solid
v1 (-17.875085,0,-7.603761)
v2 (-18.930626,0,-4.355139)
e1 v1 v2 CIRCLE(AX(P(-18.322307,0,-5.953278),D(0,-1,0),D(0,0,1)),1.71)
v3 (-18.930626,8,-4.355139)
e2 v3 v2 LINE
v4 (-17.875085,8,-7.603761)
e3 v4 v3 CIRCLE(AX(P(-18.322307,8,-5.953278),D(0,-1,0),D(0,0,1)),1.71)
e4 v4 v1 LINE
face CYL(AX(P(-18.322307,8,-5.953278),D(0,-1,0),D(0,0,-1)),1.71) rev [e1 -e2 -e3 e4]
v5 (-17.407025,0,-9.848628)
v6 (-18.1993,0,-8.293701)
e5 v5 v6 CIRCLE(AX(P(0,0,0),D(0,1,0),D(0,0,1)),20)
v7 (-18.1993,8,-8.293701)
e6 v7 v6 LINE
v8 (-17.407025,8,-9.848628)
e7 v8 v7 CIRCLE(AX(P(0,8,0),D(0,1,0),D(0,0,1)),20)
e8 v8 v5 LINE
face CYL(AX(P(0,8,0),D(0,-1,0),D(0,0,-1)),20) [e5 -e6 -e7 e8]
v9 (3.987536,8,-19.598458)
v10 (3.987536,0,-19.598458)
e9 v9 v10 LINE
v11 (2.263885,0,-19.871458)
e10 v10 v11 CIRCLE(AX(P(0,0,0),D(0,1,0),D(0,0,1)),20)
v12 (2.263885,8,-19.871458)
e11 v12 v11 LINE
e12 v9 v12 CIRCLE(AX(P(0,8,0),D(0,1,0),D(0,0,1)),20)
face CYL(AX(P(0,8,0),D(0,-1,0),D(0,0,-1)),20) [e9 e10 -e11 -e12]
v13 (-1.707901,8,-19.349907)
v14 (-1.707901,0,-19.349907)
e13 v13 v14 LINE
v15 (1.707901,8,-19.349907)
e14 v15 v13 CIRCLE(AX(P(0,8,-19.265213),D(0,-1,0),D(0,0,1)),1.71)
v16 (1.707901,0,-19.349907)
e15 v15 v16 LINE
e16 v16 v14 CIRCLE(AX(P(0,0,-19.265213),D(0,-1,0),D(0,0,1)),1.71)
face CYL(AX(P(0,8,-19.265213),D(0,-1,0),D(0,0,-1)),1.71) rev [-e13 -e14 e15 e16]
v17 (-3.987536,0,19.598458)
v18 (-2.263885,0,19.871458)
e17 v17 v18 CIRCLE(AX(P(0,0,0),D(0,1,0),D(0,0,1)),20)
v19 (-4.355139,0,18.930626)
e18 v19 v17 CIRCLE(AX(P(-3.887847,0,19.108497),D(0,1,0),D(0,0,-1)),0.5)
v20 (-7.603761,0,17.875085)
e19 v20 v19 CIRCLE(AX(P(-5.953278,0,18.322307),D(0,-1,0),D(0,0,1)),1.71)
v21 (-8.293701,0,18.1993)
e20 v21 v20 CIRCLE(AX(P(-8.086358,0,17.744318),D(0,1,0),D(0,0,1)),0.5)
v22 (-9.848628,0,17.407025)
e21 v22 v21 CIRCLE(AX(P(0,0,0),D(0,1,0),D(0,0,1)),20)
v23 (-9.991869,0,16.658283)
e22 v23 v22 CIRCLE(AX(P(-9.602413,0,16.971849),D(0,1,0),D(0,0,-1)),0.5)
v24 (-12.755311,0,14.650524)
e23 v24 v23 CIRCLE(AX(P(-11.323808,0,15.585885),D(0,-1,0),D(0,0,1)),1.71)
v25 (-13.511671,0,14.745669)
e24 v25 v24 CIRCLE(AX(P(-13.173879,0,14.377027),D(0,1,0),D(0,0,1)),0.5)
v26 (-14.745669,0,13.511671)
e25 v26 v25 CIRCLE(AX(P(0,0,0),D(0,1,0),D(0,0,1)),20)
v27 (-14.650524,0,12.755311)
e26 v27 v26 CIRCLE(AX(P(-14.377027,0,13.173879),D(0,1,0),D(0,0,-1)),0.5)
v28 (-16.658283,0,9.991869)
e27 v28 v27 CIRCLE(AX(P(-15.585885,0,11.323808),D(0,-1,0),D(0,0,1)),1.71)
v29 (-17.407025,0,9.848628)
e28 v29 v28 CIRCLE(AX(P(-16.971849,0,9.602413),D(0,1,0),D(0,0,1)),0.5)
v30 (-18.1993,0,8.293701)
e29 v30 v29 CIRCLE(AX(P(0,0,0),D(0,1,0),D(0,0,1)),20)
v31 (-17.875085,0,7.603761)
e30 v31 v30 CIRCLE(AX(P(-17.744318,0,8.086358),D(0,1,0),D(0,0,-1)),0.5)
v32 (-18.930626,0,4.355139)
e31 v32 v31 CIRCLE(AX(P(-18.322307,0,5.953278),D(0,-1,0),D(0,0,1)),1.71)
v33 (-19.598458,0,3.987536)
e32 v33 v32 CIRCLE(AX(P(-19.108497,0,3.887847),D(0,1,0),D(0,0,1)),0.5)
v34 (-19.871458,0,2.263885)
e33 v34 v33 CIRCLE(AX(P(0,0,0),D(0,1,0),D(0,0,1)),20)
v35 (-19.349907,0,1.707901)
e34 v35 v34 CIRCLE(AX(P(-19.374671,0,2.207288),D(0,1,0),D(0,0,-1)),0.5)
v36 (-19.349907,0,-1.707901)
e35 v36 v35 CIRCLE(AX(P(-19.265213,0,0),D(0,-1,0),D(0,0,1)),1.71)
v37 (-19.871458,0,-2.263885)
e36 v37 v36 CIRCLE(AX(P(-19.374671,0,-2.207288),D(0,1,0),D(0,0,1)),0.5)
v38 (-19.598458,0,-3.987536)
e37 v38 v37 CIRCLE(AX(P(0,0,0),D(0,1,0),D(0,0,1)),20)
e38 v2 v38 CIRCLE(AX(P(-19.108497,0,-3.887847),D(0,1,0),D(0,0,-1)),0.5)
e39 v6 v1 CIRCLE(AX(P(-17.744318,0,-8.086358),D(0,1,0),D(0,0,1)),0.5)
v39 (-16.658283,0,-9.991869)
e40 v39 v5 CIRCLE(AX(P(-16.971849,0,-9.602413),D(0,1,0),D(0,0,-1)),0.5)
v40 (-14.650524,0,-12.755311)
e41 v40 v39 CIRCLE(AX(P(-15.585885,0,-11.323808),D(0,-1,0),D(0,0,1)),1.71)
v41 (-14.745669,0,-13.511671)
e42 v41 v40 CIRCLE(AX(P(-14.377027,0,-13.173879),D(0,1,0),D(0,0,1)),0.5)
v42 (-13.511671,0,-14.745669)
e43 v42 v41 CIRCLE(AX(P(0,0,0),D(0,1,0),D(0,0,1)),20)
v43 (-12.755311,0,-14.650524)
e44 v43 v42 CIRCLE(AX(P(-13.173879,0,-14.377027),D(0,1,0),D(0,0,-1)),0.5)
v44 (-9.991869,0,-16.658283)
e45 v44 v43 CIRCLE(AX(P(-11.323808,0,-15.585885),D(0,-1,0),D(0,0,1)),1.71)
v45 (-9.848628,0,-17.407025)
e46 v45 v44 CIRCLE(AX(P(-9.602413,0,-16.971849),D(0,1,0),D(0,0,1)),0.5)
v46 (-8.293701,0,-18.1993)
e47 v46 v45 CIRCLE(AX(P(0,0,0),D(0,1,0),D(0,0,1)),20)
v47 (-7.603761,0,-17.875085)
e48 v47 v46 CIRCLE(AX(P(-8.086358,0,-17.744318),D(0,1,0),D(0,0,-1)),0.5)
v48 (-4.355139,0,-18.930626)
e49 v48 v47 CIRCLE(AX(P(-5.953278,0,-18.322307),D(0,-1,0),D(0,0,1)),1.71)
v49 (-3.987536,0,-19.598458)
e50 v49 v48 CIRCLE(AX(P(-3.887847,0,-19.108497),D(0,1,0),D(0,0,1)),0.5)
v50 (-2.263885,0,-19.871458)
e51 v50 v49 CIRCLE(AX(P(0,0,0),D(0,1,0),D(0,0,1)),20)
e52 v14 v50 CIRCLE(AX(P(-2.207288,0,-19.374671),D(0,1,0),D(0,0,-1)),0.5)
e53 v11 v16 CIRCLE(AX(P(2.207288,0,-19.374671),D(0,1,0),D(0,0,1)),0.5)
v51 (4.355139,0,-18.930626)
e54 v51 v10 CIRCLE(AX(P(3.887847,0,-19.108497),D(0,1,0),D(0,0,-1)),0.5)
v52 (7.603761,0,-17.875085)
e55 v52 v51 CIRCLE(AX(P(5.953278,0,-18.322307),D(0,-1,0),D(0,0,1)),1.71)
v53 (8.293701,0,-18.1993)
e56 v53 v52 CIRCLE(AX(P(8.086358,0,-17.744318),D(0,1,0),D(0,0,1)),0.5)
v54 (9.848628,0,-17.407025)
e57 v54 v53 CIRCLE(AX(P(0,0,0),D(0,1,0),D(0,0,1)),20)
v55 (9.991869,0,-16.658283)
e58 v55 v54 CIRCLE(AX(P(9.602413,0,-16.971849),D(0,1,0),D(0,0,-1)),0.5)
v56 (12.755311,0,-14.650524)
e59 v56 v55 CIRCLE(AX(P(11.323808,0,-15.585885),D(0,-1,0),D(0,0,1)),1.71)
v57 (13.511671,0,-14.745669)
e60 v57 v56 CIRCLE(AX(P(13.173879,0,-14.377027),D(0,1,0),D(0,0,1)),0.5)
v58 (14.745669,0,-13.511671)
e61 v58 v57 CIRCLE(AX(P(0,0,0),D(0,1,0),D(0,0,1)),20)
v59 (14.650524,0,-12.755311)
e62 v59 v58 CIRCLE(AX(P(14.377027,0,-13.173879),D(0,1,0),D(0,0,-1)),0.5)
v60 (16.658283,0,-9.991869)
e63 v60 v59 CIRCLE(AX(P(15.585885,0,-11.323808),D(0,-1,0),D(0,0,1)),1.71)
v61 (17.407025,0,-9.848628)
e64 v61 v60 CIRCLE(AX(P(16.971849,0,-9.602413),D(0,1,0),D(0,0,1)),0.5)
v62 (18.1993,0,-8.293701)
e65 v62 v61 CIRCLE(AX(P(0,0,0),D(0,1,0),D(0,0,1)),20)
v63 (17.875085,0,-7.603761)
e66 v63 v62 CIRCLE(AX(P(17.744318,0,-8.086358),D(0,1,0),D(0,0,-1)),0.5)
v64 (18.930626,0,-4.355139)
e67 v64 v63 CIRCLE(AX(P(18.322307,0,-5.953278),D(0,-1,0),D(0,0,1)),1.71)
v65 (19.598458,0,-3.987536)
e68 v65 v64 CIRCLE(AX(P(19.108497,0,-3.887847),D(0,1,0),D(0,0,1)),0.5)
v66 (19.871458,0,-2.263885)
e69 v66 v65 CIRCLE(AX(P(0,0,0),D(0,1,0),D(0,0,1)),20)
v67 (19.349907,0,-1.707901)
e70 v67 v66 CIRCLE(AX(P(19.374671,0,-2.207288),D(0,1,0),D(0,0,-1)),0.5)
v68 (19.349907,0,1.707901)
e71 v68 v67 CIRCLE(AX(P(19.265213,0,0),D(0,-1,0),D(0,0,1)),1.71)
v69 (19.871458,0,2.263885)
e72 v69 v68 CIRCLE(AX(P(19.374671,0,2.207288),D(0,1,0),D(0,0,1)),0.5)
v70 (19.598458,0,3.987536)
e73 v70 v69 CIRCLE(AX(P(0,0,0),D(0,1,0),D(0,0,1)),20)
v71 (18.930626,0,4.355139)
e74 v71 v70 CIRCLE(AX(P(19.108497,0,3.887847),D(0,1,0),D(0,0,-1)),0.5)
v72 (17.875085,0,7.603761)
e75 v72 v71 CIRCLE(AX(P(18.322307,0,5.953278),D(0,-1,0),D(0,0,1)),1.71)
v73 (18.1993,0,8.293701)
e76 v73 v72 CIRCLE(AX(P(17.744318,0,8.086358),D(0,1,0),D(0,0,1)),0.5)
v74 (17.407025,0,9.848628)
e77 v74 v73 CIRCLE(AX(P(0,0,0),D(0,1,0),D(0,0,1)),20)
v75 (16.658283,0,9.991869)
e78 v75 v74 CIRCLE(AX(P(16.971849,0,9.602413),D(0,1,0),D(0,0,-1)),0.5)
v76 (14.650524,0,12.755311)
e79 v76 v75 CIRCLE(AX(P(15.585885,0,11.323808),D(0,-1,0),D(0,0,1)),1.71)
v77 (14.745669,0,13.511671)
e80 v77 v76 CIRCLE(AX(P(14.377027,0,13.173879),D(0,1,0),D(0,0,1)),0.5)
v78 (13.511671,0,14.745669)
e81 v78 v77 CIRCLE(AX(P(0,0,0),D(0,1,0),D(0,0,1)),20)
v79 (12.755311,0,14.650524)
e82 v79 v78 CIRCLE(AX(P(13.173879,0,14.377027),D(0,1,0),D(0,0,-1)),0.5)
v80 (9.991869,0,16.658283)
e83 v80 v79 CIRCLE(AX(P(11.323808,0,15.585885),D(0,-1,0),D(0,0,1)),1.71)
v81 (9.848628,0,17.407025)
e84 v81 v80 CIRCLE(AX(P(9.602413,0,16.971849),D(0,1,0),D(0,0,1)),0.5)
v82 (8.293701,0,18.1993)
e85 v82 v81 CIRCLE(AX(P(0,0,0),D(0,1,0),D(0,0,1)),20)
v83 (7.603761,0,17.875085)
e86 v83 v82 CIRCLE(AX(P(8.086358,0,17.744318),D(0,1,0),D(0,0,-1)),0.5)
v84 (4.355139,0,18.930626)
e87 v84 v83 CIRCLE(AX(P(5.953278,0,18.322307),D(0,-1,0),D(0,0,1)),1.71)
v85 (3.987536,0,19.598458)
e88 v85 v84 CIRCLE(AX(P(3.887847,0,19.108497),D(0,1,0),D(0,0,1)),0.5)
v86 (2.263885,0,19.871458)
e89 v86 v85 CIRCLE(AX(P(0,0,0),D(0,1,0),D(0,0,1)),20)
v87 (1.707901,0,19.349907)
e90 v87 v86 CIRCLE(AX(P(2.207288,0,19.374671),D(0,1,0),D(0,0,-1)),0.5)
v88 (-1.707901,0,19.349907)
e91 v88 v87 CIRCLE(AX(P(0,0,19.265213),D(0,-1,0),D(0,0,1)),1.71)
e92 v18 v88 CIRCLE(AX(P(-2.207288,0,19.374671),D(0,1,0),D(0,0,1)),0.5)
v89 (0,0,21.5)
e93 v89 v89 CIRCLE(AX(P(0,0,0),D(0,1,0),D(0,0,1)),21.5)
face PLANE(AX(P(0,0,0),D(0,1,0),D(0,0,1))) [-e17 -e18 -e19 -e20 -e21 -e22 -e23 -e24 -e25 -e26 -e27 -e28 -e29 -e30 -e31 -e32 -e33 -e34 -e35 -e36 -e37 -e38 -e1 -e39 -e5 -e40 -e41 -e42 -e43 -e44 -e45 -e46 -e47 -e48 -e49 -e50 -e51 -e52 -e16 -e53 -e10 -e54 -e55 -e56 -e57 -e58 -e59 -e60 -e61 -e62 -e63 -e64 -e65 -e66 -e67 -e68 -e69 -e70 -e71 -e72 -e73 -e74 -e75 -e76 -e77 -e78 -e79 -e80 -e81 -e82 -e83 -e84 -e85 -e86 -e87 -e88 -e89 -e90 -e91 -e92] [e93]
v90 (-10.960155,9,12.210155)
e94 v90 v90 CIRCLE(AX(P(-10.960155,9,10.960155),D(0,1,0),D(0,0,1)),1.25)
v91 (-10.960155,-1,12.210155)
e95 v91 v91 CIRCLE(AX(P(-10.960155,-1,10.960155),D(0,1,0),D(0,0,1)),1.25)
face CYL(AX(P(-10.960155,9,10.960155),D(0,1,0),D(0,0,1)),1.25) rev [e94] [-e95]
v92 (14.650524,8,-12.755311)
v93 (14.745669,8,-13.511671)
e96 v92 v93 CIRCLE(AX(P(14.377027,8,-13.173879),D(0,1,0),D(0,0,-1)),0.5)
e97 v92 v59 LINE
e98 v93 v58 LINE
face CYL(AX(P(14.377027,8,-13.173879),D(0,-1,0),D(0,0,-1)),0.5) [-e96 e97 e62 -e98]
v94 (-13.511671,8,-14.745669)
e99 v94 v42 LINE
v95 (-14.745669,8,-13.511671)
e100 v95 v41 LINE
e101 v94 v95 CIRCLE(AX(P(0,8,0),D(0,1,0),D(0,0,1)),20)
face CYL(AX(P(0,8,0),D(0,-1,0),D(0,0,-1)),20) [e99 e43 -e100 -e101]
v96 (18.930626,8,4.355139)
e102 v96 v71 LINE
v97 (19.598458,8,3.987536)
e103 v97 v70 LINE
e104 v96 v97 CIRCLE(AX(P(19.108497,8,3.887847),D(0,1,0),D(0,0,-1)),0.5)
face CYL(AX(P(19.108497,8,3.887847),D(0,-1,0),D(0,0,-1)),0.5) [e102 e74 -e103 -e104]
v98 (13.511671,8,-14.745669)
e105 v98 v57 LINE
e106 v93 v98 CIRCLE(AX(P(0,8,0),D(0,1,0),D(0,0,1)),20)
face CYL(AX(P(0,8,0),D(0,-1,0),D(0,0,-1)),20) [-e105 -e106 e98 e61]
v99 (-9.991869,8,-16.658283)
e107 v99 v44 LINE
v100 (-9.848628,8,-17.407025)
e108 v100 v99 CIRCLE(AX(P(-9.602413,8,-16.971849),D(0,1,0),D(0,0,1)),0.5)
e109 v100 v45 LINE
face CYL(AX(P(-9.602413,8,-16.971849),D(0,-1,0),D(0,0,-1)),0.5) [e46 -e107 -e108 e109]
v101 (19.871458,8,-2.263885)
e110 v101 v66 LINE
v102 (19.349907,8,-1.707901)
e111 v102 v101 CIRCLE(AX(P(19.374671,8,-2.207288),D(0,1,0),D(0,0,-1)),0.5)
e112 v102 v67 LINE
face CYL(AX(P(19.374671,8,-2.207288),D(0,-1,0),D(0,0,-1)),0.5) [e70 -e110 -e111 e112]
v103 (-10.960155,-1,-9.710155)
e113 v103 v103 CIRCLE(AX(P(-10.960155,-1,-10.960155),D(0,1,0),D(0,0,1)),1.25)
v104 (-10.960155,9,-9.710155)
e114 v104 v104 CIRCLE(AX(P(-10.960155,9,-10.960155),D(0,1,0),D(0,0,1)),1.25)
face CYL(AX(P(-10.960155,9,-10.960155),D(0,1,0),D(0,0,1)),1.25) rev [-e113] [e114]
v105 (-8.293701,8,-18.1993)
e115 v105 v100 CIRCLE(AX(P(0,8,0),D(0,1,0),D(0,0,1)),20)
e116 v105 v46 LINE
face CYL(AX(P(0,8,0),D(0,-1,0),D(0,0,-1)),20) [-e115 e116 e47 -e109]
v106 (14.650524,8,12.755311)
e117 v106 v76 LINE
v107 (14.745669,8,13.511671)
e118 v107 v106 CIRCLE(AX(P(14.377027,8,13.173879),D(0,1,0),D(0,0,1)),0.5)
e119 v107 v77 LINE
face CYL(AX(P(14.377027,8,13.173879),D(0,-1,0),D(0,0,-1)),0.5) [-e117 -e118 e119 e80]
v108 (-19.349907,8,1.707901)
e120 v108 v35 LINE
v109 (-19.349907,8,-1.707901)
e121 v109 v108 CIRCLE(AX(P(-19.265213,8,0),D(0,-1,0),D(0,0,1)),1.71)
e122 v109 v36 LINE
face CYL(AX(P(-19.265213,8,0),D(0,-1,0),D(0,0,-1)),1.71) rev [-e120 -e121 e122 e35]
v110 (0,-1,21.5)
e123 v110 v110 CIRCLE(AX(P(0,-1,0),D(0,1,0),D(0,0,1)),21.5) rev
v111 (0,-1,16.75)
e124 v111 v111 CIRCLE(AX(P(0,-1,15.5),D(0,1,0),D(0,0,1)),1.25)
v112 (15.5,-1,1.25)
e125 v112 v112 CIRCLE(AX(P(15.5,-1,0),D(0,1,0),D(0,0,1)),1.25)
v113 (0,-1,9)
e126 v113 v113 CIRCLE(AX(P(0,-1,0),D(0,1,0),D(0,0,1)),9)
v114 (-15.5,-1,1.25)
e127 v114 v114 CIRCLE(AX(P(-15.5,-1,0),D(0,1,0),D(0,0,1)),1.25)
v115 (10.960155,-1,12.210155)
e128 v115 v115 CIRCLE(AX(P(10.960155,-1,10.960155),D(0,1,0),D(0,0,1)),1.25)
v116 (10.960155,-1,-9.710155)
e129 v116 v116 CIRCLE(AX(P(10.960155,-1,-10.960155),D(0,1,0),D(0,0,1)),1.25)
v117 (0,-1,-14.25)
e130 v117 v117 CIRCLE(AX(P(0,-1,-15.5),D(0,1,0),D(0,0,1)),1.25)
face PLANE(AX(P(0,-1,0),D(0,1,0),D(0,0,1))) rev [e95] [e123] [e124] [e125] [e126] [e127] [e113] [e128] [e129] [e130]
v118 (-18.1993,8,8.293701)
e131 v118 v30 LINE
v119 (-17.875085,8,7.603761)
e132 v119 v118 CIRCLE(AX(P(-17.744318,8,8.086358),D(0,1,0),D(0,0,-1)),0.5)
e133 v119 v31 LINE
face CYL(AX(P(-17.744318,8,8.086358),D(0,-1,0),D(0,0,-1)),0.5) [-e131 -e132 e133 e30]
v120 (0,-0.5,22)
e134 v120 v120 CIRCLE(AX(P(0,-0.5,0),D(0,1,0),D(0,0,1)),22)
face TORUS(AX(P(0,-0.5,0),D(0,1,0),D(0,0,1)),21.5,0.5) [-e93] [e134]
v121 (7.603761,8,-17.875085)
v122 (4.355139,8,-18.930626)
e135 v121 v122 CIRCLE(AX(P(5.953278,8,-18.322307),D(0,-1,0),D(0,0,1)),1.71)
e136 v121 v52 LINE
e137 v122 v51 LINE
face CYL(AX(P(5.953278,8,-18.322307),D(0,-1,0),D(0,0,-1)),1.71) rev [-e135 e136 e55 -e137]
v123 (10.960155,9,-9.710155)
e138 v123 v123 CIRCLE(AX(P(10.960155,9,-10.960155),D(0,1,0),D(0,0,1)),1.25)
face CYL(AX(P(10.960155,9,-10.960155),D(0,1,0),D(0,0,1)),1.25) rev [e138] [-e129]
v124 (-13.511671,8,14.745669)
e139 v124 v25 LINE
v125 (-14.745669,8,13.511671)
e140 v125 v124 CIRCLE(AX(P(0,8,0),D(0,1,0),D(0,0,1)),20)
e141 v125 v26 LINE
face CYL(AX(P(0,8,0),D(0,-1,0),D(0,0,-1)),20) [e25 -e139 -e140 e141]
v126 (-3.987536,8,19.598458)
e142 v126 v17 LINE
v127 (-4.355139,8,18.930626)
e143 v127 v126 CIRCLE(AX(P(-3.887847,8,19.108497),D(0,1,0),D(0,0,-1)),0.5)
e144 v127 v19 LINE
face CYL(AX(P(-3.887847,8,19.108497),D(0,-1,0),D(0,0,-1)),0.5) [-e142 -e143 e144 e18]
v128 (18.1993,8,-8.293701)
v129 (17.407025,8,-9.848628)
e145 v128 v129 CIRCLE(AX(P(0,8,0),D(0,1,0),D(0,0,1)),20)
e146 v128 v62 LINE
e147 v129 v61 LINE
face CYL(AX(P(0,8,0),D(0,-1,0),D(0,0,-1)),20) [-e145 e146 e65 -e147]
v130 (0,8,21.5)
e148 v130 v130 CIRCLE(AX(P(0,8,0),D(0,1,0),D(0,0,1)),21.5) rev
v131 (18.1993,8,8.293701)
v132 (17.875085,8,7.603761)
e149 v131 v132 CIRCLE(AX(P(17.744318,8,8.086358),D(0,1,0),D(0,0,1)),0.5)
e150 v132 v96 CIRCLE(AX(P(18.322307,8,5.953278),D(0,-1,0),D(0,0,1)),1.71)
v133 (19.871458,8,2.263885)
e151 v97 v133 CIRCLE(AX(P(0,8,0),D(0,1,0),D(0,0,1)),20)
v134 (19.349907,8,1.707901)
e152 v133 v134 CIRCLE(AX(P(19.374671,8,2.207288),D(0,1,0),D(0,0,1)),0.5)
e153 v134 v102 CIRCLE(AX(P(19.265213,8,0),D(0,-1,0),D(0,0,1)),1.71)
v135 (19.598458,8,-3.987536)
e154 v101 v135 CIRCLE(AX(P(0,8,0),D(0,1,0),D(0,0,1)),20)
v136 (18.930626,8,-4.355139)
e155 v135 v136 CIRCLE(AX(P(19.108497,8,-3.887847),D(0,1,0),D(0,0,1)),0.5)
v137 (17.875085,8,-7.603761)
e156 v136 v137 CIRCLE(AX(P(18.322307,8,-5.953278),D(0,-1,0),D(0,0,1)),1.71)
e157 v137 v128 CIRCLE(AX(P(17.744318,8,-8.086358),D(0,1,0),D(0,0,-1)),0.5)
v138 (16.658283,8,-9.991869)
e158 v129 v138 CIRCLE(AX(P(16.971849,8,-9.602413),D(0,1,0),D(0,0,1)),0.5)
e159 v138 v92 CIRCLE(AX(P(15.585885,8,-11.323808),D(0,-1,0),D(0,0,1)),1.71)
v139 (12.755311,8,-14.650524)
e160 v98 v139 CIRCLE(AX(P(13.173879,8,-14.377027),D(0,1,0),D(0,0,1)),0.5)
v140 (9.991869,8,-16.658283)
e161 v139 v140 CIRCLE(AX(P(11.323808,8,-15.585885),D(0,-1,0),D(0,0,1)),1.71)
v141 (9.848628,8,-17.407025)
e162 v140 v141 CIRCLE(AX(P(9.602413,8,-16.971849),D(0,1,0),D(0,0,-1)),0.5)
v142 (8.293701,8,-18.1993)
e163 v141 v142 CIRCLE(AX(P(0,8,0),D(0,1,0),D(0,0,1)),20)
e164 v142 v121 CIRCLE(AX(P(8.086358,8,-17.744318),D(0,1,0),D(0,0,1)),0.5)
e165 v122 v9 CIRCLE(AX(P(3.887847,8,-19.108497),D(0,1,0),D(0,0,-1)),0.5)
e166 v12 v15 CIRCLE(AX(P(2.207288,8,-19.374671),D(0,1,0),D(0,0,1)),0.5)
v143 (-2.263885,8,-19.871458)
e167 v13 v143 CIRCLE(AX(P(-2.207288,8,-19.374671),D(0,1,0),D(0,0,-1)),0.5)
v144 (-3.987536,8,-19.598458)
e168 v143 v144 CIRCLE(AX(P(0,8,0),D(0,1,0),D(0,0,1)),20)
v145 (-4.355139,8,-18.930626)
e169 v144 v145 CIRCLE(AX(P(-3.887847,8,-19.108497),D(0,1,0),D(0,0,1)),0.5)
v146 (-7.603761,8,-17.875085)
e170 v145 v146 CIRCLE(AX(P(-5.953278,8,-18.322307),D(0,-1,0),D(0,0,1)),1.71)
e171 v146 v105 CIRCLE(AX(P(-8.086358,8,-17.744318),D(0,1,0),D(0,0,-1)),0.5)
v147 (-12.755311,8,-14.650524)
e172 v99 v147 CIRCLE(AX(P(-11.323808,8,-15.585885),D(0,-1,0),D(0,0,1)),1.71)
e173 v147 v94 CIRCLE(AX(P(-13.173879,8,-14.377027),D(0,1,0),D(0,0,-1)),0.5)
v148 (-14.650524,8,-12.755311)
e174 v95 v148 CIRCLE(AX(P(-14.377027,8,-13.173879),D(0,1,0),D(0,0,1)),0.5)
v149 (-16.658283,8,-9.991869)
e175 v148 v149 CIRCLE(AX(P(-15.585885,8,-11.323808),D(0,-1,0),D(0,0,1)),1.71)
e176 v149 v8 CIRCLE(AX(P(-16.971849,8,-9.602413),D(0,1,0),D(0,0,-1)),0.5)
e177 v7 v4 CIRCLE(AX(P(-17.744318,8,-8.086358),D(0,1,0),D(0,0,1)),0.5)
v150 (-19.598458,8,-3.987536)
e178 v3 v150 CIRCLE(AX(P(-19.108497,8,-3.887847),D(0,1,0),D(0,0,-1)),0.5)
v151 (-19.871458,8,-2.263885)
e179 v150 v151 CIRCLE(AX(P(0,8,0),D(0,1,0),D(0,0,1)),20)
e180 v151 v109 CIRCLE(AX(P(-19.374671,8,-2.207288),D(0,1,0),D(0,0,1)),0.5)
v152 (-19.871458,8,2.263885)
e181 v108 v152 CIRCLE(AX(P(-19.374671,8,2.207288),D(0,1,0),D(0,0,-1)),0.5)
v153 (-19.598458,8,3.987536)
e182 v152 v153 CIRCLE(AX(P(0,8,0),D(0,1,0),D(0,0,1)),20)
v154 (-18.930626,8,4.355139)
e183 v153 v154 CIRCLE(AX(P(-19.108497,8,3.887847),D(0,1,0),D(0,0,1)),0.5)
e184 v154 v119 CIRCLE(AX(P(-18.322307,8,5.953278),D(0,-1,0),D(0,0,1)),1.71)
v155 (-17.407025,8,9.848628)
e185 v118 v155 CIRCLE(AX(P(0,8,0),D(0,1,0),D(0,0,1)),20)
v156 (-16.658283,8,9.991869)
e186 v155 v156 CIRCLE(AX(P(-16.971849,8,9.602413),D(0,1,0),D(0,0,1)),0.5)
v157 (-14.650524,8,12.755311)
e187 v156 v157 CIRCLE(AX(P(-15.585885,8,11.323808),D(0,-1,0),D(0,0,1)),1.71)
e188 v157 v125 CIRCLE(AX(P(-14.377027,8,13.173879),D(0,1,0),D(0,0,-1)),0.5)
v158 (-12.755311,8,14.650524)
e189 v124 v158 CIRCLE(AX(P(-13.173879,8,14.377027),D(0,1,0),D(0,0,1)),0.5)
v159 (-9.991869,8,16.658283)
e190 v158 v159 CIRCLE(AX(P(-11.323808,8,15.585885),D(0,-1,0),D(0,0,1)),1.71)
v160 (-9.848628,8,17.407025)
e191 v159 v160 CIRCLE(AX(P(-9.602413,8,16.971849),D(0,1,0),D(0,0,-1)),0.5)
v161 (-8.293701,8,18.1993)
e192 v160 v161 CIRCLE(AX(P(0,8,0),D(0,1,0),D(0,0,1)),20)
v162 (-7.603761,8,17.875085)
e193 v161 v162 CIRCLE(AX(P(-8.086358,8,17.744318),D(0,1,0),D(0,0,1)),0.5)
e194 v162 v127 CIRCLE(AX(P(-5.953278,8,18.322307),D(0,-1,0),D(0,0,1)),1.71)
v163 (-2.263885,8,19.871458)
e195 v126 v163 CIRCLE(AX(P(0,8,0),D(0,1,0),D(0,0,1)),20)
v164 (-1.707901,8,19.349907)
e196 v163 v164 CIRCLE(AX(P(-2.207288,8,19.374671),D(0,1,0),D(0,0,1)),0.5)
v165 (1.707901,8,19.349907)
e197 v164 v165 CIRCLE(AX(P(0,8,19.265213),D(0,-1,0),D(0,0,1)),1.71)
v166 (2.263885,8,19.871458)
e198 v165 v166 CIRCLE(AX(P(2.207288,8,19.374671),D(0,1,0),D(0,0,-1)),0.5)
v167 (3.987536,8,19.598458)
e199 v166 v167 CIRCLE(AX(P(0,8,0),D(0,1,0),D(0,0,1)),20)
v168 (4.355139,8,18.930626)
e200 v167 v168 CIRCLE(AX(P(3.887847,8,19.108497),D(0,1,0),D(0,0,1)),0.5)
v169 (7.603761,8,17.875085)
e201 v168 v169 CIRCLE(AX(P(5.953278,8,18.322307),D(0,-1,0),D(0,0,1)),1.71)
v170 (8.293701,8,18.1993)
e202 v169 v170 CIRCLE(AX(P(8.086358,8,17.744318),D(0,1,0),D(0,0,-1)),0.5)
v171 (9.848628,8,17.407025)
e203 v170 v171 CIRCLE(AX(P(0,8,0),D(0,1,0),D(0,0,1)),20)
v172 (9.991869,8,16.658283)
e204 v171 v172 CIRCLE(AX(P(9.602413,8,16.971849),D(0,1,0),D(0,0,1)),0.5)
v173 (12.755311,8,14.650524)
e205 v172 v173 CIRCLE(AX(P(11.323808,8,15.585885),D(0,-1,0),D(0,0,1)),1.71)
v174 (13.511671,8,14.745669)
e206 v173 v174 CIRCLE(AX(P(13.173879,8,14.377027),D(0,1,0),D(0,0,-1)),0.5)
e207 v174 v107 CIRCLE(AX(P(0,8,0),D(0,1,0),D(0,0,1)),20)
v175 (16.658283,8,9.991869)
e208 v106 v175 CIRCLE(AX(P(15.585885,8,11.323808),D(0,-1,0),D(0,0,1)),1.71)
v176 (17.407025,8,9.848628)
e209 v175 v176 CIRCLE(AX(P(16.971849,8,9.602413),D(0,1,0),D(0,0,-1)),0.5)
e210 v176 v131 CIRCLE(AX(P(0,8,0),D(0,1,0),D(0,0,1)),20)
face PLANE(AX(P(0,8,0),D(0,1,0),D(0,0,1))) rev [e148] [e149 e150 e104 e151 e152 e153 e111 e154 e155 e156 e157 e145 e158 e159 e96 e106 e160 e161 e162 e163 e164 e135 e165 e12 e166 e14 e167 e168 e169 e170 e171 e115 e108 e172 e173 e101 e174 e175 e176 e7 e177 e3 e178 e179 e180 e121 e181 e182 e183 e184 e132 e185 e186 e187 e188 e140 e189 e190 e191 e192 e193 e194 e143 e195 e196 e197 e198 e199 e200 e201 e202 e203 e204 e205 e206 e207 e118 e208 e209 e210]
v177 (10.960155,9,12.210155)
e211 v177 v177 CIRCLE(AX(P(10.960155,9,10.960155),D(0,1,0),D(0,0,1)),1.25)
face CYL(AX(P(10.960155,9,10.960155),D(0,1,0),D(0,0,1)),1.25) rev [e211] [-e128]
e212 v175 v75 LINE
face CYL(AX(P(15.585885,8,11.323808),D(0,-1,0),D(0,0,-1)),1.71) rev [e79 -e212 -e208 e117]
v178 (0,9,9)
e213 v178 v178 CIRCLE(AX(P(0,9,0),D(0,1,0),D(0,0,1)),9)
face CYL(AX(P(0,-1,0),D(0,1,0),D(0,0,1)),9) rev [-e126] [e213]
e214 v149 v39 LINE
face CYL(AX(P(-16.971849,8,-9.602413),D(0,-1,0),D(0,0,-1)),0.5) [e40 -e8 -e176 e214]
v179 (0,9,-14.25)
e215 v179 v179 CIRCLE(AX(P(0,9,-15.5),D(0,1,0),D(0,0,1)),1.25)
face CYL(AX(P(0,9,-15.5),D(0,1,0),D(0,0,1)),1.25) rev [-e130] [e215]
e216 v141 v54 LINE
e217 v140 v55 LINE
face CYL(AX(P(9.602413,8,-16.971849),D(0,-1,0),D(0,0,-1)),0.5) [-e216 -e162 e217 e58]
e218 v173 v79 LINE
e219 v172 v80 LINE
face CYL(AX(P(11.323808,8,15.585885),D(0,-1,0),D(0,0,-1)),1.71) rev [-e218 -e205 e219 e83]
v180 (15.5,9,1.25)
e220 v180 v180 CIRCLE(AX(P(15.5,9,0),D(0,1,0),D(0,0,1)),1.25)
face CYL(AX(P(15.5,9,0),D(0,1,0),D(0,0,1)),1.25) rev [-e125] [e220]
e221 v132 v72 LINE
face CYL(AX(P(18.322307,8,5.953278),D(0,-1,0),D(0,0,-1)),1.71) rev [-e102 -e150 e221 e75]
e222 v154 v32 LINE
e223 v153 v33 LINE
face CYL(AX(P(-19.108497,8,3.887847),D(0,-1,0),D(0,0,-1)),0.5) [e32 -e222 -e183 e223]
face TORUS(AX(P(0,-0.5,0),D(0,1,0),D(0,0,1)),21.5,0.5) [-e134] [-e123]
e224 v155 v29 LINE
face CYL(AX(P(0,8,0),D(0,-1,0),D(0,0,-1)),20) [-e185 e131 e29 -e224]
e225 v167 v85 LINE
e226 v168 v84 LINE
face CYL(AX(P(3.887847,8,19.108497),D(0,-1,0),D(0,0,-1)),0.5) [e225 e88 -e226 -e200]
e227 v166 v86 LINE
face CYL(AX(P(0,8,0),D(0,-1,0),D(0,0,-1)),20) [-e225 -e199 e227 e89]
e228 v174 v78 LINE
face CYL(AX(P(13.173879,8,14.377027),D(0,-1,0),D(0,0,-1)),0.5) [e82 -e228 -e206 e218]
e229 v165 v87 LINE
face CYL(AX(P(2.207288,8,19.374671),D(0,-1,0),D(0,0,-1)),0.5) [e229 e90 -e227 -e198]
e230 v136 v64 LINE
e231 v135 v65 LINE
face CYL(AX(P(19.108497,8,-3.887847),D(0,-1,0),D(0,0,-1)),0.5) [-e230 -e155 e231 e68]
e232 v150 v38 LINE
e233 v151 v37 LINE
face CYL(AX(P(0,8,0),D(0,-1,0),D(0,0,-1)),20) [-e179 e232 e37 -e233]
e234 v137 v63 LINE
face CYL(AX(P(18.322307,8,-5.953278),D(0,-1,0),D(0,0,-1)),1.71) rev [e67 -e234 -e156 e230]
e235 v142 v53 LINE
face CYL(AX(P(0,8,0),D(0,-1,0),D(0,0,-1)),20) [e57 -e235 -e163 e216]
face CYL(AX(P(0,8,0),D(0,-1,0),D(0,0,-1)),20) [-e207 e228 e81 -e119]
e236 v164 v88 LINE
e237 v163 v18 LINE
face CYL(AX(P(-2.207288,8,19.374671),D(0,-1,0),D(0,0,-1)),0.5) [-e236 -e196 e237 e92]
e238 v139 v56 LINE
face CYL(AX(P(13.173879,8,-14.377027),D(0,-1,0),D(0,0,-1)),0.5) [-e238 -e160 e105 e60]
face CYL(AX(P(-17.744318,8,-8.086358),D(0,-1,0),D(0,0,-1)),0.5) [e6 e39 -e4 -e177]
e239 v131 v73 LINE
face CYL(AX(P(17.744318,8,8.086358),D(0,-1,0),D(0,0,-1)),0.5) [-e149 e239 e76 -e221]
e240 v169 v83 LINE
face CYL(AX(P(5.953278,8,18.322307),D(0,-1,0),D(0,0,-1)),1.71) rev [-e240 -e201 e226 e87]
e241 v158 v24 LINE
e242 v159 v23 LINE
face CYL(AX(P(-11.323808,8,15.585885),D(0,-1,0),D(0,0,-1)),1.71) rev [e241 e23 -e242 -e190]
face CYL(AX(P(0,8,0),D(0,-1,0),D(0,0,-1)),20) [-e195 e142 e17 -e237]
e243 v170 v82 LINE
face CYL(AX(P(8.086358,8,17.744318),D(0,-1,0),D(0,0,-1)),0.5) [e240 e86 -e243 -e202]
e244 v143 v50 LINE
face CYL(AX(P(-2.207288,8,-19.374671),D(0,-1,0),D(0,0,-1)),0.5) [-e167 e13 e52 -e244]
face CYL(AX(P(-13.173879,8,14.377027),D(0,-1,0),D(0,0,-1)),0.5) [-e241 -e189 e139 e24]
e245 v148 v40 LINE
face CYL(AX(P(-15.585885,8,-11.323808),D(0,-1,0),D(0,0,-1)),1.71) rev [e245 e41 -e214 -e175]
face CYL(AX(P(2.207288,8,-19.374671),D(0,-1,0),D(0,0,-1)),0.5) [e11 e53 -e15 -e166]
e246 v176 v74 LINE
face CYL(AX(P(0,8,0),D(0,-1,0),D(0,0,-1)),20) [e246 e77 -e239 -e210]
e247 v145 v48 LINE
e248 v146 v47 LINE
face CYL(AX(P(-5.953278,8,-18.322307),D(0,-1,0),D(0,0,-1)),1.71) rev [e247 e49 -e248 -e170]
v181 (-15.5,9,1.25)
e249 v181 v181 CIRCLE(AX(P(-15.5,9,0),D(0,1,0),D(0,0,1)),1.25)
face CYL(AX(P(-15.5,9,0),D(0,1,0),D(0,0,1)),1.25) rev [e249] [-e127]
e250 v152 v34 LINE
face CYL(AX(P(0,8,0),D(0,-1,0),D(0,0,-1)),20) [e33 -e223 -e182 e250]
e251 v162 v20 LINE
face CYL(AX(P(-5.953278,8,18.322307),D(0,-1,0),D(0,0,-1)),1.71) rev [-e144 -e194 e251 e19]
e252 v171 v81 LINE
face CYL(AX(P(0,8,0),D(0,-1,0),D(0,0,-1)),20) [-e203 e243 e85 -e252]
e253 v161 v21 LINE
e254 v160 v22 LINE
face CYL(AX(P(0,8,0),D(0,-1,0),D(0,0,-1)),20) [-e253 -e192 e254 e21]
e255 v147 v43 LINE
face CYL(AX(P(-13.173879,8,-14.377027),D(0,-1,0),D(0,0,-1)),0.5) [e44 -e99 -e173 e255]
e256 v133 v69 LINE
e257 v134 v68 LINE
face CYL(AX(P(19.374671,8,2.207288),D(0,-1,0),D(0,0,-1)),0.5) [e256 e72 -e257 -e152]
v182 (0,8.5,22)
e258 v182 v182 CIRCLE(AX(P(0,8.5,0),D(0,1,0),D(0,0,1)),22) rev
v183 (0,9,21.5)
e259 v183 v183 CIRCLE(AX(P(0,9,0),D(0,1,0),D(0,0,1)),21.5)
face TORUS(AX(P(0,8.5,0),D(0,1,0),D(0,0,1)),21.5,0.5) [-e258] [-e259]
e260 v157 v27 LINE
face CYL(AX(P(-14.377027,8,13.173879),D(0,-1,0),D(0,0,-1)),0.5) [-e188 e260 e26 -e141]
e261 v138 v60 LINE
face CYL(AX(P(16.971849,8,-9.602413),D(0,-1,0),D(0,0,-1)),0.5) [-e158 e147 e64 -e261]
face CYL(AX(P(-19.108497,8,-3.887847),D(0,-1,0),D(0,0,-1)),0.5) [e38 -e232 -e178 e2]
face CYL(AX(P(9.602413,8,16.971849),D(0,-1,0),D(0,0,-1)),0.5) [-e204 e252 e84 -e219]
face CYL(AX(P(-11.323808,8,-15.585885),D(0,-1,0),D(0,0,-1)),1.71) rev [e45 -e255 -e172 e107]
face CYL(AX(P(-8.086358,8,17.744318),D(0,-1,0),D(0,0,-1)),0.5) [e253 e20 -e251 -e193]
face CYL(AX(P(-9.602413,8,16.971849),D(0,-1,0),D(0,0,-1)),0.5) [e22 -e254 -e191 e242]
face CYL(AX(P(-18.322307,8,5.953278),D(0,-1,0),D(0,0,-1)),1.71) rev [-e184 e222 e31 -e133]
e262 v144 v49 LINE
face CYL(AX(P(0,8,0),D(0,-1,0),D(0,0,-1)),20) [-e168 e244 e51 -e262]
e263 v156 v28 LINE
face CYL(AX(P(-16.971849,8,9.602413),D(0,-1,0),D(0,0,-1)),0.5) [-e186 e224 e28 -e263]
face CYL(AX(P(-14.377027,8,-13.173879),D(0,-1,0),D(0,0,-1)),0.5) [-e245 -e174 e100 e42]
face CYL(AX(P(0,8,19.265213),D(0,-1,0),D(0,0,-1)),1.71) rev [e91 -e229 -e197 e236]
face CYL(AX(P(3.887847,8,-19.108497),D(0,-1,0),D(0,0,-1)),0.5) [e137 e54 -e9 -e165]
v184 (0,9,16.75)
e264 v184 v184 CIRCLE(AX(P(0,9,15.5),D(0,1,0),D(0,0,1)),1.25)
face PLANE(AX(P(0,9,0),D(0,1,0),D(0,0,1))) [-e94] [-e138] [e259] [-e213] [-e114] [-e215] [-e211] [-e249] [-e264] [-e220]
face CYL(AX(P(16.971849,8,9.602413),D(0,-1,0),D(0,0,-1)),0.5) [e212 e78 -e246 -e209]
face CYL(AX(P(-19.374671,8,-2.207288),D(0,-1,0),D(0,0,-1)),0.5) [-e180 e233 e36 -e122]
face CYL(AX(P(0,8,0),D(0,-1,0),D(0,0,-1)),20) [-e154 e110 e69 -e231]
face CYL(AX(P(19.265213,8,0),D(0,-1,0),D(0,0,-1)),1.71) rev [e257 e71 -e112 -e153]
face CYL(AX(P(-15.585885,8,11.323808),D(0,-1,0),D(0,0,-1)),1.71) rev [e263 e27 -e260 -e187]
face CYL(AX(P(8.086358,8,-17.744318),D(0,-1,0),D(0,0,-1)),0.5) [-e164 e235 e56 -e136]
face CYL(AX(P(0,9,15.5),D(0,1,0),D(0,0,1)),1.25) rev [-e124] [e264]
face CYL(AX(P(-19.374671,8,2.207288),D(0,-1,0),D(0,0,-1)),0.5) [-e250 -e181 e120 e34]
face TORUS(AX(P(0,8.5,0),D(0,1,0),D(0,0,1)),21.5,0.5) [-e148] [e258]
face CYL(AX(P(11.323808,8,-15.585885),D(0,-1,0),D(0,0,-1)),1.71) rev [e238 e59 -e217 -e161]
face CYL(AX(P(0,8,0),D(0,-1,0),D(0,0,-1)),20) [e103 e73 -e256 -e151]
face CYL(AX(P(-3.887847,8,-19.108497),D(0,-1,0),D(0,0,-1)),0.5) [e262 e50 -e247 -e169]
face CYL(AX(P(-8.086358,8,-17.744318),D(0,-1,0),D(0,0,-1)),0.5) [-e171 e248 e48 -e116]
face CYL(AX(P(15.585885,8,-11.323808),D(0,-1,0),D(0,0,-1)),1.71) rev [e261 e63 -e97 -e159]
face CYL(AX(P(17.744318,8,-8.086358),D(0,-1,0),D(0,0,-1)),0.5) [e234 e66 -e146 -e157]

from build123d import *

# Parameters (mm, degrees)
EXTRUDE_1_DEPTH     = 8
SKETCH_2_R          = 22
EXTRUDE_2_DEPTH     = 1
FILLET_1_R          = 0.5
EXTRUDE_START       = 1
SKETCH_3_R          = 22
EXTRUDE_3_DEPTH     = 1
FILLET_2_R          = 0.5
HOLE_WIZARD_M3_1_D  = 2.5
SKETCH_9_R          = 9
CUT_EXTRUDE_2_DEPTH = 33.680269442


with BuildPart() as part:
    # 草图1 → 凸台-拉伸1 (new body)
    with BuildSketch(Plane(origin=(0, 0, 0), x_dir=(1, 0, 0), z_dir=(0, 1, 0))):
        with BuildLine():
            ThreePointArc((-19.598458084, 3.987535674), (-19.753766812, 3.128689301), (-19.871457558, 2.263884825))
            ThreePointArc((-19.871457558, 2.263884825), (-19.739336252, 1.865206806), (-19.349906932, 1.707901346))
            ThreePointArc((-19.349906932, 1.707901346), (-17.555213412, 0), (-19.349906932, -1.707901346))
            ThreePointArc((-19.349906932, -1.707901346), (-19.739336252, -1.865206806), (-19.871457558, -2.263884825))
            ThreePointArc((-19.871457558, -2.263884825), (-19.753766812, -3.128689301), (-19.598458084, -3.987535674))
            ThreePointArc((-19.598458084, -3.987535674), (-19.349604971, -4.325873273), (-18.930625618, -4.355139377))
            ThreePointArc((-18.930625618, -4.355139377), (-16.69600011, -5.424859284), (-17.875084537, -7.603760786))
            ThreePointArc((-17.875084537, -7.603760786), (-18.196843769, -7.873707446), (-18.199300315, -8.293700504))
            ThreePointArc((-18.199300315, -8.293700504), (-17.820130484, -9.079809995), (-17.407024981, -9.848628398))
            ThreePointArc((-17.407024981, -9.848628398), (-17.065799538, -10.093506735), (-16.658282771, -9.991868714))
            ThreePointArc((-16.658282771, -9.991868714), (-14.20246599, -10.318695544), (-14.650524324, -12.755311142))
            ThreePointArc((-14.650524324, -12.755311142), (-14.873117433, -13.111474743), (-14.745668755, -13.511670991))
            ThreePointArc((-14.745668755, -13.511670991), (-14.142135624, -14.142135624), (-13.511670991, -14.745668755))
            ThreePointArc((-13.511670991, -14.745668755), (-13.111474743, -14.873117433), (-12.755311142, -14.650524324))
            ThreePointArc((-12.755311142, -14.650524324), (-10.318695544, -14.20246599), (-9.991868714, -16.658282771))
            ThreePointArc((-9.991868714, -16.658282771), (-10.093506735, -17.065799538), (-9.848628398, -17.407024981))
            ThreePointArc((-9.848628398, -17.407024981), (-9.079809995, -17.820130484), (-8.293700504, -18.199300315))
            ThreePointArc((-8.293700504, -18.199300315), (-7.873707446, -18.196843769), (-7.603760786, -17.875084537))
            ThreePointArc((-7.603760786, -17.875084537), (-5.424859284, -16.69600011), (-4.355139377, -18.930625618))
            ThreePointArc((-4.355139377, -18.930625618), (-4.325873273, -19.349604971), (-3.987535674, -19.598458084))
            ThreePointArc((-3.987535674, -19.598458084), (-3.128689301, -19.753766812), (-2.263884825, -19.871457558))
            ThreePointArc((-2.263884825, -19.871457558), (-1.865206806, -19.739336252), (-1.707901346, -19.349906932))
            ThreePointArc((-1.707901346, -19.349906932), (0, -17.555213412), (1.707901346, -19.349906932))
            ThreePointArc((1.707901346, -19.349906932), (1.865206806, -19.739336252), (2.263884825, -19.871457558))
            ThreePointArc((2.263884825, -19.871457558), (3.128689301, -19.753766812), (3.987535674, -19.598458084))
            ThreePointArc((3.987535674, -19.598458084), (4.325873273, -19.349604971), (4.355139377, -18.930625618))
            ThreePointArc((4.355139377, -18.930625618), (5.424859284, -16.69600011), (7.603760786, -17.875084537))
            ThreePointArc((7.603760786, -17.875084537), (7.873707446, -18.196843769), (8.293700504, -18.199300315))
            ThreePointArc((8.293700504, -18.199300315), (9.079809995, -17.820130484), (9.848628398, -17.407024981))
            ThreePointArc((9.848628398, -17.407024981), (10.093506735, -17.065799538), (9.991868714, -16.658282771))
            ThreePointArc((9.991868714, -16.658282771), (10.318695544, -14.20246599), (12.755311142, -14.650524324))
            ThreePointArc((12.755311142, -14.650524324), (13.111474743, -14.873117433), (13.511670991, -14.745668755))
            ThreePointArc((13.511670991, -14.745668755), (14.142135624, -14.142135624), (14.745668755, -13.511670991))
            ThreePointArc((14.745668755, -13.511670991), (14.873117433, -13.111474743), (14.650524324, -12.755311142))
            ThreePointArc((14.650524324, -12.755311142), (14.20246599, -10.318695544), (16.658282771, -9.991868714))
            ThreePointArc((16.658282771, -9.991868714), (17.065799538, -10.093506735), (17.407024981, -9.848628398))
            ThreePointArc((17.407024981, -9.848628398), (17.820130484, -9.079809995), (18.199300315, -8.293700504))
            ThreePointArc((18.199300315, -8.293700504), (18.196843769, -7.873707446), (17.875084537, -7.603760786))
            ThreePointArc((17.875084537, -7.603760786), (16.69600011, -5.424859284), (18.930625618, -4.355139377))
            ThreePointArc((18.930625618, -4.355139377), (19.349604971, -4.325873273), (19.598458084, -3.987535674))
            ThreePointArc((19.598458084, -3.987535674), (19.753766812, -3.128689301), (19.871457558, -2.263884825))
            ThreePointArc((19.871457558, -2.263884825), (19.739336252, -1.865206806), (19.349906932, -1.707901346))
            ThreePointArc((19.349906932, -1.707901346), (17.555213412, 0), (19.349906932, 1.707901346))
            ThreePointArc((19.349906932, 1.707901346), (19.739336252, 1.865206806), (19.871457558, 2.263884825))
            ThreePointArc((19.871457558, 2.263884825), (19.753766812, 3.128689301), (19.598458084, 3.987535674))
            ThreePointArc((19.598458084, 3.987535674), (19.349604971, 4.325873273), (18.930625618, 4.355139377))
            ThreePointArc((18.930625618, 4.355139377), (16.69600011, 5.424859284), (17.875084537, 7.603760786))
            ThreePointArc((17.875084537, 7.603760786), (18.196843769, 7.873707446), (18.199300315, 8.293700504))
            ThreePointArc((18.199300315, 8.293700504), (17.820130484, 9.079809995), (17.407024981, 9.848628398))
            ThreePointArc((17.407024981, 9.848628398), (17.065799538, 10.093506735), (16.658282771, 9.991868714))
            ThreePointArc((16.658282771, 9.991868714), (14.20246599, 10.318695544), (14.650524324, 12.755311142))
            ThreePointArc((14.650524324, 12.755311142), (14.873117433, 13.111474743), (14.745668755, 13.511670991))
            ThreePointArc((14.745668755, 13.511670991), (14.142135624, 14.142135624), (13.511670991, 14.745668755))
            ThreePointArc((13.511670991, 14.745668755), (13.111474743, 14.873117433), (12.755311142, 14.650524324))
            ThreePointArc((12.755311142, 14.650524324), (10.318695544, 14.20246599), (9.991868714, 16.658282771))
            ThreePointArc((9.991868714, 16.658282771), (10.093506735, 17.065799538), (9.848628398, 17.407024981))
            ThreePointArc((9.848628398, 17.407024981), (9.079809995, 17.820130484), (8.293700504, 18.199300315))
            ThreePointArc((8.293700504, 18.199300315), (7.873707446, 18.196843769), (7.603760786, 17.875084537))
            ThreePointArc((7.603760786, 17.875084537), (5.424859284, 16.69600011), (4.355139377, 18.930625618))
            ThreePointArc((4.355139377, 18.930625618), (4.325873273, 19.349604971), (3.987535674, 19.598458084))
            ThreePointArc((3.987535674, 19.598458084), (3.128689301, 19.753766812), (2.263884825, 19.871457558))
            ThreePointArc((2.263884825, 19.871457558), (1.865206806, 19.739336252), (1.707901346, 19.349906932))
            ThreePointArc((1.707901346, 19.349906932), (0, 17.555213412), (-1.707901346, 19.349906932))
            ThreePointArc((-1.707901346, 19.349906932), (-1.865206806, 19.739336252), (-2.263884825, 19.871457558))
            ThreePointArc((-2.263884825, 19.871457558), (-3.128689301, 19.753766812), (-3.987535674, 19.598458084))
            ThreePointArc((-3.987535674, 19.598458084), (-4.325873273, 19.349604971), (-4.355139377, 18.930625618))
            ThreePointArc((-4.355139377, 18.930625618), (-5.424859284, 16.69600011), (-7.603760786, 17.875084537))
            ThreePointArc((-7.603760786, 17.875084537), (-7.873707446, 18.196843769), (-8.293700504, 18.199300315))
            ThreePointArc((-8.293700504, 18.199300315), (-9.079809995, 17.820130484), (-9.848628398, 17.407024981))
            ThreePointArc((-9.848628398, 17.407024981), (-10.093506735, 17.065799538), (-9.991868714, 16.658282771))
            ThreePointArc((-9.991868714, 16.658282771), (-10.318695544, 14.20246599), (-12.755311142, 14.650524324))
            ThreePointArc((-12.755311142, 14.650524324), (-13.111474743, 14.873117433), (-13.511670991, 14.745668755))
            ThreePointArc((-13.511670991, 14.745668755), (-14.142135624, 14.142135624), (-14.745668755, 13.511670991))
            ThreePointArc((-14.745668755, 13.511670991), (-14.873117433, 13.111474743), (-14.650524324, 12.755311142))
            ThreePointArc((-14.650524324, 12.755311142), (-14.20246599, 10.318695544), (-16.658282771, 9.991868714))
            ThreePointArc((-16.658282771, 9.991868714), (-17.065799538, 10.093506735), (-17.407024981, 9.848628398))
            ThreePointArc((-17.407024981, 9.848628398), (-17.820130484, 9.079809995), (-18.199300315, 8.293700504))
            ThreePointArc((-18.199300315, 8.293700504), (-18.196843769, 7.873707446), (-17.875084537, 7.603760786))
            ThreePointArc((-17.875084537, 7.603760786), (-16.69600011, 5.424859284), (-18.930625618, 4.355139377))
            ThreePointArc((-18.930625618, 4.355139377), (-19.349604971, 4.325873273), (-19.598458084, 3.987535674))
        make_face()
    extrude(amount=EXTRUDE_1_DEPTH)

    # 草图2 → 凸台-拉伸2 (add)
    with BuildSketch(Plane(origin=(0, 0, 0), x_dir=(1, 0, 0), z_dir=(0, 1, 0))):
        with Locations(Location((0, 0, 0), (0, 0, 270))):
            Circle(SKETCH_2_R)
    extrude(amount=-EXTRUDE_2_DEPTH)

    # 圆角1
    fillet_1_edges = [part.edges().sort_by_distance(p)[0] for p in [
        (0, 0, -22),
        (0, -1, -22),
    ]]
    fillet(fillet_1_edges, radius=FILLET_1_R - 0.0001)  # a hair under: the kernel refuses the full size

    # 草图3 → 凸台-拉伸3 (add)
    with BuildSketch(Plane(origin=(0, 8, 0), x_dir=(1, 0, 0), z_dir=(0, 1, 0)).offset(EXTRUDE_START)):
        with Locations(Location((0, 0, 0), (0, 0, 270))):
            Circle(SKETCH_3_R)
    extrude(amount=-EXTRUDE_3_DEPTH)

    # 圆角2
    fillet_2_edges = [part.edges().sort_by_distance(p)[0] for p in [
        (0, 8, -22),
        (0, 9, -22),
    ]]
    fillet(fillet_2_edges, radius=FILLET_2_R - 0.0001)  # a hair under: the kernel refuses the full size

    # M3 螺纹孔的螺纹孔钻头1 (through all)
    with Locations(Plane(origin=(-10.960155108, 9, -10.960155108), x_dir=(0, 0, 1), z_dir=(0, 1, 0))):
        with Locations((0, 0), (-4.539844892, 10.960155108), (0, 21.920310216), (10.960155108, 26.460155108), (21.920310216, 21.920310216), (26.460155108, 10.960155108), (21.920310216, 0), (10.960155108, -4.539844892)):
            Hole(HOLE_WIZARD_M3_1_D / 2)

    # 草图9 → 切除-拉伸2 (cut, through all)
    with BuildSketch(Plane(origin=(0, 9, 0), x_dir=(1, 0, 0), z_dir=(0, 1, 0))):
        with Locations(Location((0, 0, 0), (0, 0, 270))):
            Circle(SKETCH_9_R)
    extrude(amount=-CUT_EXTRUDE_2_DEPTH, mode=Mode.SUBTRACT)


solid = part.part
